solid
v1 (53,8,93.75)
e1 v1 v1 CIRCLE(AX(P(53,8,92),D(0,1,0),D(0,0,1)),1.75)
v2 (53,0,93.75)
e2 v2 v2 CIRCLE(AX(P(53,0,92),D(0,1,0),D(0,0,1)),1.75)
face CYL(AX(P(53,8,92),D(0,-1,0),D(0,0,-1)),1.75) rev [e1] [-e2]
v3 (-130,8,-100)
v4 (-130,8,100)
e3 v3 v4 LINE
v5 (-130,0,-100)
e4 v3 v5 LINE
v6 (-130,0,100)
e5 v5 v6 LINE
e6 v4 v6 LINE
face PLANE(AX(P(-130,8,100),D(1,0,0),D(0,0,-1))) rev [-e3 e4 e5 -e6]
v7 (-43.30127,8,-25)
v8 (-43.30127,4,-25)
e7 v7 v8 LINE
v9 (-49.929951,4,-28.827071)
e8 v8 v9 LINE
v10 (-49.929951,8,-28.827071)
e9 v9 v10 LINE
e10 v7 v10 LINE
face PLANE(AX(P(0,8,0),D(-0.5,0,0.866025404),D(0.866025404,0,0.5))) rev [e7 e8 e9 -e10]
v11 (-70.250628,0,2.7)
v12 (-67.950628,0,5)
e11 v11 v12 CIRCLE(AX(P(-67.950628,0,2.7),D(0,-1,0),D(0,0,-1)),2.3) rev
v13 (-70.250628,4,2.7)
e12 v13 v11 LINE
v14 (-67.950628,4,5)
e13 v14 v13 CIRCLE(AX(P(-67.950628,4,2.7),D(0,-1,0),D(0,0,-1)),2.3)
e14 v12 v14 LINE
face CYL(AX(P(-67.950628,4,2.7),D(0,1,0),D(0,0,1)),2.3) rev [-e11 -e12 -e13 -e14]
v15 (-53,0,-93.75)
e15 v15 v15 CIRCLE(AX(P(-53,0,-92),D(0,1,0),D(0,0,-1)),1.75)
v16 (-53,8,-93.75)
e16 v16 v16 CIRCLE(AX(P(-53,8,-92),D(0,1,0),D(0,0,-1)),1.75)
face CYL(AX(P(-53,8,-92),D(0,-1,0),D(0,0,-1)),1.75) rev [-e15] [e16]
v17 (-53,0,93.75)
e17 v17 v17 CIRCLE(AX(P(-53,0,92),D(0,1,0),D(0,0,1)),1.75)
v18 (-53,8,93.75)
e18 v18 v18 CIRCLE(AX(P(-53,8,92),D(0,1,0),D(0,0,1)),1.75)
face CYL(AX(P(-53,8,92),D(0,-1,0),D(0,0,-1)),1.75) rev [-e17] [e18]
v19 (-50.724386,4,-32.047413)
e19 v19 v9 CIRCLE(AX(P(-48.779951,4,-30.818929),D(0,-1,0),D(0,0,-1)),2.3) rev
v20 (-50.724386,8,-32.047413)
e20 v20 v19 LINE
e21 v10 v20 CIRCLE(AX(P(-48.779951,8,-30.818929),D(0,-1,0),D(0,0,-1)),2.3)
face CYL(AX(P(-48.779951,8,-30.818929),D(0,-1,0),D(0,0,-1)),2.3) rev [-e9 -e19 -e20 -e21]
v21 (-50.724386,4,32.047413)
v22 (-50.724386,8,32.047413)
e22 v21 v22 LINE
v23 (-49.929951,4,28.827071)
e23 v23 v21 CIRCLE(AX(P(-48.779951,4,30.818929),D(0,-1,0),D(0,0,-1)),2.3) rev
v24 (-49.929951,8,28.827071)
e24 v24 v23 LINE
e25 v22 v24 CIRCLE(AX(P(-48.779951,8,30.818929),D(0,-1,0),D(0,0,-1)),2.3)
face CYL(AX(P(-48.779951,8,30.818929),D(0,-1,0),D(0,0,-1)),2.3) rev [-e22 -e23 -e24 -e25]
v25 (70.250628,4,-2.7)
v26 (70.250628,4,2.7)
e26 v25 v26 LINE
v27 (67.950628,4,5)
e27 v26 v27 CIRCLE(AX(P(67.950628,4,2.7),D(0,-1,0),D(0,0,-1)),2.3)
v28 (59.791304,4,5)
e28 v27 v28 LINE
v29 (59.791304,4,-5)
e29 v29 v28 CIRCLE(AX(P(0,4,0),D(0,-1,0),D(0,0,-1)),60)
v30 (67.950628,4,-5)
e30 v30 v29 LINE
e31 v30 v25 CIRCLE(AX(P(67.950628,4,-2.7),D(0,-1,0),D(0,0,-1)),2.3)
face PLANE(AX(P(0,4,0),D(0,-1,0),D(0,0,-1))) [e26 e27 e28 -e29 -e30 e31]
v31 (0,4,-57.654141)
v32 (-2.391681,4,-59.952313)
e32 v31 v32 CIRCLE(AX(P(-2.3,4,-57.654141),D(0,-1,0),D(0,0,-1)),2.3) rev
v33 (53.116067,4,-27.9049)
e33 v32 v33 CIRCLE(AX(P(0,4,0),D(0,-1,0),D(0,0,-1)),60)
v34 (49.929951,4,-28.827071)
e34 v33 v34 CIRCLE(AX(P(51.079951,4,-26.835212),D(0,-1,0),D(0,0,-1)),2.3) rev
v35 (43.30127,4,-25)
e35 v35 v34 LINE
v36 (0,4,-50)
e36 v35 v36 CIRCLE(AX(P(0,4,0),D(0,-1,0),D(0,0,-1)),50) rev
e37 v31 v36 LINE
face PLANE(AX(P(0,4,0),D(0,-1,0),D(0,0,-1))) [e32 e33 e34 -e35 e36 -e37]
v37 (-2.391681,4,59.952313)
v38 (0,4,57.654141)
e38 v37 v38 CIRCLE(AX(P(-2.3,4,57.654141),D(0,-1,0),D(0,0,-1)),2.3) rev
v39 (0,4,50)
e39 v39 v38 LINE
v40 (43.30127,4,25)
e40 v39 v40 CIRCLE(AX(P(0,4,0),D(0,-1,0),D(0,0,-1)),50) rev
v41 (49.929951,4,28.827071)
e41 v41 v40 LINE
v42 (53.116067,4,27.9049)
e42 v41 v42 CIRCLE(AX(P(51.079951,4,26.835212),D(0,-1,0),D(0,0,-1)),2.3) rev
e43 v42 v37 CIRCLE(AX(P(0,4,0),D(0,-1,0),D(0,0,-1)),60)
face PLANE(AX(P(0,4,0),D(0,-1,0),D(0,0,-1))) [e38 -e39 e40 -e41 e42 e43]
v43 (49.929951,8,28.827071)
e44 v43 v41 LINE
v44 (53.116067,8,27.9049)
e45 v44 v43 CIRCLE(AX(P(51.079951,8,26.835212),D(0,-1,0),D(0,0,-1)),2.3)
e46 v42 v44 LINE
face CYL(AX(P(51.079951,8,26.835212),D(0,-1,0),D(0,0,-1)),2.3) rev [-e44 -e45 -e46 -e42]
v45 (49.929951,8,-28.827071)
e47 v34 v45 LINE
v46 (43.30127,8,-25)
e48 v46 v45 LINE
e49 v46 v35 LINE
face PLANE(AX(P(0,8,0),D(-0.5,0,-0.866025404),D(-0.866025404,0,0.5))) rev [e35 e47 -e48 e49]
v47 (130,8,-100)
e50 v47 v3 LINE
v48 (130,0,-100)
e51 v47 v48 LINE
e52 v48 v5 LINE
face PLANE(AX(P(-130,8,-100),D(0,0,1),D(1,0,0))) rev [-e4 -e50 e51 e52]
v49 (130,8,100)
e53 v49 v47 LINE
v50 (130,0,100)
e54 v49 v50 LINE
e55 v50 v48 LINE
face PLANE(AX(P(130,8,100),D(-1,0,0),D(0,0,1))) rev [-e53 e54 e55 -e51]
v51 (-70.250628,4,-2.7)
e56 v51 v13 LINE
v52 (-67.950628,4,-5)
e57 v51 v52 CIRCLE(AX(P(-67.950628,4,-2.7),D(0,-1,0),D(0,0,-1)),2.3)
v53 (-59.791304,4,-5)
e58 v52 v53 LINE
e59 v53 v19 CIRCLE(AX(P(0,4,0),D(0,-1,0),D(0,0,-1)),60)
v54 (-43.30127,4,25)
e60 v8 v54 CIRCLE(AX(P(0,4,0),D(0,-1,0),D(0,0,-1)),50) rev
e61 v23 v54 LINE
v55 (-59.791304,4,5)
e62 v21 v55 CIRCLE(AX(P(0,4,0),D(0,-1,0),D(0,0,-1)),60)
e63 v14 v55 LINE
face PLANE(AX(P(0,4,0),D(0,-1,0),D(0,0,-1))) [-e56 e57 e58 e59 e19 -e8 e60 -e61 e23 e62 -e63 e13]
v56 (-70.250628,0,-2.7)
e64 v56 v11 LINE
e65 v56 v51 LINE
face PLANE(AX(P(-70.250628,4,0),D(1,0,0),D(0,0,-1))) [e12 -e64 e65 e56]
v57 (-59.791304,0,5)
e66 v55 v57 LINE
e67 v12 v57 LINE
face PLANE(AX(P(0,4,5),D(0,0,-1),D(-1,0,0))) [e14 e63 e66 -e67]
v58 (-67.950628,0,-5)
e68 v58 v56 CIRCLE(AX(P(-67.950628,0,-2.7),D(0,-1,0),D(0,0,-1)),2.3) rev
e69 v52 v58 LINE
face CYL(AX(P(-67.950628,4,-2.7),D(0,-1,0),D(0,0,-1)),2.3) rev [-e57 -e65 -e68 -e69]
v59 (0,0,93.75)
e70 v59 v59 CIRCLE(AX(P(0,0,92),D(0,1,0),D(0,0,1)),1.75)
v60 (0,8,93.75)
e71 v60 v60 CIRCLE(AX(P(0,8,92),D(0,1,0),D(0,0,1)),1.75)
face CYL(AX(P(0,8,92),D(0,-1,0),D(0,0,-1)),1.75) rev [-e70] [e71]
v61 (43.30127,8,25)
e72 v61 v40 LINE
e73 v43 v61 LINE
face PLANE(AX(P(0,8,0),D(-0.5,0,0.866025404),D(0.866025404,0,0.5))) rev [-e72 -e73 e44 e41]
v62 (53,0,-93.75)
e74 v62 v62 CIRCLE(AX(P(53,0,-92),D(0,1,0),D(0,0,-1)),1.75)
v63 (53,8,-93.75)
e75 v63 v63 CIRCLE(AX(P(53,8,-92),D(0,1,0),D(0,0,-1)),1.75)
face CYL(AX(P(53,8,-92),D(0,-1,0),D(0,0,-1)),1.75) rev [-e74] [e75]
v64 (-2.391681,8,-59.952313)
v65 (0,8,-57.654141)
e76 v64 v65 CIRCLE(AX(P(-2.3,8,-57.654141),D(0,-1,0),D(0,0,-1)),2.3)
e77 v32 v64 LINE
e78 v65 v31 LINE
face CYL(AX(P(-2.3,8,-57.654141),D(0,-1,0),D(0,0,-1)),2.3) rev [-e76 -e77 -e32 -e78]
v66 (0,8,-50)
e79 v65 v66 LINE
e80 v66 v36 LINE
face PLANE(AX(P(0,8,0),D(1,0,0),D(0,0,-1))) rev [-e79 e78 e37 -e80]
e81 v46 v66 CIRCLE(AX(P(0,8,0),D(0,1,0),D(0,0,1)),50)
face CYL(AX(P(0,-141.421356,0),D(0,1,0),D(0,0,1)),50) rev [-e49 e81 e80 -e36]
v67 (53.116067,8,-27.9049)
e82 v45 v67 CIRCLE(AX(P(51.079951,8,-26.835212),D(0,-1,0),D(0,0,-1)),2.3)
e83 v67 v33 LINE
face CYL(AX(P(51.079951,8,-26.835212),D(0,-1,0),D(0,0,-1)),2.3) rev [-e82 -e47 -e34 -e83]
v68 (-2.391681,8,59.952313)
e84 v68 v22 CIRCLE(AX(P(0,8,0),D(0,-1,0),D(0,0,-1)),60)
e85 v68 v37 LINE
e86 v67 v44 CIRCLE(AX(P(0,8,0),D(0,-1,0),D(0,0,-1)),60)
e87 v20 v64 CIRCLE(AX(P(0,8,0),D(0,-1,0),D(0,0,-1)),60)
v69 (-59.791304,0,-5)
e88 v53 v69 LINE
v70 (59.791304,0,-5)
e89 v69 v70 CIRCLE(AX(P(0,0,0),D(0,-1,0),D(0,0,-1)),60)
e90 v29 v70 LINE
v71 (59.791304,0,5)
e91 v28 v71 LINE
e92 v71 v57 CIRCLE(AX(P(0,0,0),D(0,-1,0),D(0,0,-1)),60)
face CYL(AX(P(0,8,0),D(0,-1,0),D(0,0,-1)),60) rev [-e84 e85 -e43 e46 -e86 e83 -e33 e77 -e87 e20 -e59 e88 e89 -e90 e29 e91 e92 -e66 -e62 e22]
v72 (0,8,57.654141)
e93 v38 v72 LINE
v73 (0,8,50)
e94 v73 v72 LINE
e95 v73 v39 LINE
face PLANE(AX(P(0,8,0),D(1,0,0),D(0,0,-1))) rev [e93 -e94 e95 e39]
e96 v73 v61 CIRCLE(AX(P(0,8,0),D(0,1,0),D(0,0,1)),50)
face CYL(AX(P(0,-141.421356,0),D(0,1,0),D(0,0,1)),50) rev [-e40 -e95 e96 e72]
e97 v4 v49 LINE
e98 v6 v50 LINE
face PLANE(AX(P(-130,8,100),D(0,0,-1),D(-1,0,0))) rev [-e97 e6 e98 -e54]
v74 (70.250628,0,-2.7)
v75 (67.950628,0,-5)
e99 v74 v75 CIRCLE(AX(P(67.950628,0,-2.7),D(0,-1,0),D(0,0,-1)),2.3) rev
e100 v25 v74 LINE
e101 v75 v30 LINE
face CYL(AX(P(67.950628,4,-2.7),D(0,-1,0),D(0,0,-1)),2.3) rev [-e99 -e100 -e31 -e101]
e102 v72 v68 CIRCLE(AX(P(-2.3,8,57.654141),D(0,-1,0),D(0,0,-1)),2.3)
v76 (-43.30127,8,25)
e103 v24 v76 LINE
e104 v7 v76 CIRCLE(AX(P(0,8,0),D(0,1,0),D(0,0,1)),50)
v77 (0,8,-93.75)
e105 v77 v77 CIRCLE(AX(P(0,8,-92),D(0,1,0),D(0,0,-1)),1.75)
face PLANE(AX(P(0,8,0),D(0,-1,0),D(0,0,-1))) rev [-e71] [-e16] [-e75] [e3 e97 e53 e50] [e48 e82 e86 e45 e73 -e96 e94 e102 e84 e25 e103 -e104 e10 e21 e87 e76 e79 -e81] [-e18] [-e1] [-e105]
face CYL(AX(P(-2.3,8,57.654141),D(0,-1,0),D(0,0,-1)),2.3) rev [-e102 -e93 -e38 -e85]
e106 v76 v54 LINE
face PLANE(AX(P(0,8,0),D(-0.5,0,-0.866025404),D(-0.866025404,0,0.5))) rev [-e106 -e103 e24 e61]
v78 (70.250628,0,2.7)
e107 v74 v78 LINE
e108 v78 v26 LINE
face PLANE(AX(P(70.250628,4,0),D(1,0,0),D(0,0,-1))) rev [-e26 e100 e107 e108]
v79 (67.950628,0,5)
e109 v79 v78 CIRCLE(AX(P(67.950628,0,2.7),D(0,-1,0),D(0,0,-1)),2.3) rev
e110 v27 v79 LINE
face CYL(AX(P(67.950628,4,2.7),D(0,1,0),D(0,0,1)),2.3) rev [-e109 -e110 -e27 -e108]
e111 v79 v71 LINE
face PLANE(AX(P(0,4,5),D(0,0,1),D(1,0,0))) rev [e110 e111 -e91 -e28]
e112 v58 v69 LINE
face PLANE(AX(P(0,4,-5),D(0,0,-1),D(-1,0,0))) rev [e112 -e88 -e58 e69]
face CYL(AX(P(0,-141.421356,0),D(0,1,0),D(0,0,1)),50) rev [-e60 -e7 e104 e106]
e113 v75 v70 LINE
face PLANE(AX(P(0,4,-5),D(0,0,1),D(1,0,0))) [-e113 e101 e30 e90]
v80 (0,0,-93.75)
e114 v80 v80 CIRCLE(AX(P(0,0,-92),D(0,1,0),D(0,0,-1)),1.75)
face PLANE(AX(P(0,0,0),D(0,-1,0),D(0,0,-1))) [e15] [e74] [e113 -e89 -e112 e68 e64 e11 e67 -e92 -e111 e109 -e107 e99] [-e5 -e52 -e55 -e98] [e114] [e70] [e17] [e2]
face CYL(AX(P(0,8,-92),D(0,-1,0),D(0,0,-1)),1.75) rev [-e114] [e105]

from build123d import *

# Parameters (mm, degrees)
SKIZZE1_W                       = 260
SKIZZE1_H                       = 200
SKIZZE1_R                       = 1.749999999999997
SKIZZE1_R_2                     = 1.7500000000000038
SKIZZE1_R_3                     = 1.7500000000000042
AUFSATZ_LINEAR_AUSTRAGEN1_DEPTH = 8
SKIZZE2_R                       = 50
SCHNITT_LINEAR_AUSTRAGEN1_DEPTH = 8
SCHNITT_LINEAR_AUSTRAGEN4_DEPTH = 165.2071862008481
SCHNITT_LINEAR_AUSTRAGEN5_DEPTH = 4
VERRUNDUNG1_R                   = 2.3


with BuildPart() as part:
    # Skizze1 → Aufsatz-Linear austragen1 (new body)
    with BuildSketch(Plane(origin=(0, 0, 0), x_dir=(1, 0, 0), z_dir=(0, 1, 0))):
        Rectangle(SKIZZE1_W, SKIZZE1_H)
        with Locations(Location((-53, -92, 0), (0, 0, 270))):
            Circle(SKIZZE1_R, mode=Mode.SUBTRACT)
        with Locations(Location((53, -92, 0), (0, 0, 270))):
            Circle(SKIZZE1_R_2, mode=Mode.SUBTRACT)
        with Locations(Location((0, -92, 0), (0, 0, 270))):
            Circle(SKIZZE1_R_3, mode=Mode.SUBTRACT)
        with Locations(Location((-5.551e-14, 91.99999999999991, 0), (0, 0, 90))):
            Circle(SKIZZE1_R_3, mode=Mode.SUBTRACT)
        with Locations(Location((52.99999999999994, 91.99999999999991, 0), (0, 0, 90))):
            Circle(SKIZZE1_R_2, mode=Mode.SUBTRACT)
        with Locations(Location((-53.00000000000003, 91.99999999999989, 0), (0, 0, 90))):
            Circle(SKIZZE1_R, mode=Mode.SUBTRACT)
    extrude(amount=AUFSATZ_LINEAR_AUSTRAGEN1_DEPTH)

    # Skizze2 → Schnitt-Linear austragen1 (cut)
    with BuildSketch(Plane(origin=(0, 8, 0), x_dir=(1, 0, 0), z_dir=(0, 1, 0))):
        with Locations(Location((0, 0, 0), (0, 0, 270))):
            Circle(SKIZZE2_R)
    extrude(amount=-SCHNITT_LINEAR_AUSTRAGEN1_DEPTH, mode=Mode.SUBTRACT)

    # Skizze3 → Schnitt-Linear austragen4 (cut, through all)
    with BuildSketch(Plane.XZ):
        with BuildLine():
            ThreePointArc((60.00000000000001, 0), (59.947803224682126, 2.5021767593021864), (59.79130371550694, 5.000000000000675))
            Line((59.791303715506885, 5), (49.749371855331, 5))
            ThreePointArc((49.749371855331006, 5.000000000000001), (49.937303655516644, 2.503138752990944), (50.00000000000001, 0))
            ThreePointArc((50.00000000000001, -1.225e-14), (49.937303655516644, -2.503138752990955), (49.749371855331006, -5.00000000000001))
            Line((49.749371855331, -5), (59.791303715506885, -5))
            ThreePointArc((59.79130371550694, -5.0000000000006795), (59.947803224682126, -2.5021767593021957), (60.00000000000001, -1.47e-14))
        make_face()
        with BuildLine():
            ThreePointArc((59.79130371550694, 5.000000000000675), (57.257520364495285, 17.932550340356187), (51.961524227066455, 29.99999999999978))
            Line((51.961524227066455, 29.99999999999978), (43.30127018922205, 24.999999999999826))
            ThreePointArc((43.301270189222045, 24.999999999999822), (47.58787131429482, 15.342571615414302), (49.749371855331006, 5.000000000000001))
            Line((49.749371855331, 5), (59.791303715506885, 5))
        make_face()
        with BuildLine():
            Line((59.791303715506885, -5), (49.749371855331, -5))
            ThreePointArc((49.749371855331006, -5.00000000000001), (47.58787131429479, -15.342571615414398), (43.301270189221945, -24.999999999999986))
            Line((43.301270189221945, -24.999999999999993), (51.961524227066334, -29.999999999999993))
            ThreePointArc((51.961524227066334, -29.999999999999982), (57.25752036449525, -17.932550340356304), (59.79130371550694, -5.0000000000006795))
        make_face()
        with BuildLine():
            Line((-43.30127018922192, -25.00000000000002), (-51.961524227066306, -30.00000000000003))
            ThreePointArc((-51.96152422706632, -30.00000000000001), (-30.000000000000117, -51.961524227066256), (-2.7748e-13, -60.00000000000001))
            Line((-2.4633e-13, -60.00000000000001), (-1.9949e-13, -50.00000000000001))
            ThreePointArc((-1.8682e-13, -50.00000000000001), (-25.000000000000064, -43.3012701892219), (-43.30127018922194, -25.00000000000001))
        make_face()
        with BuildLine():
            ThreePointArc((3.67e-15, 60.00000000000001), (-29.999999999999876, 51.9615242270664), (-51.961524227066185, 30.000000000000256))
            Line((-51.961524227066185, 30.000000000000245), (-43.30127018922183, 25.0000000000002))
            ThreePointArc((-43.30127018922182, 25.000000000000213), (-24.999999999999897, 43.301270189221995), (3.06e-15, 50.00000000000001))
            Line((0, 50), (0, 60.00000000000001))
        make_face()
    extrude(amount=-SCHNITT_LINEAR_AUSTRAGEN4_DEPTH, mode=Mode.SUBTRACT)

    # Skizze3<5> → Schnitt-Linear austragen5 (cut)
    with BuildSketch(Plane.XZ):
        with BuildLine():
            Line((70.25062814466901, 5), (59.791303715506885, 5))
            ThreePointArc((59.79130371550694, 5.000000000000675), (59.947803224682126, 2.5021767593021864), (60.00000000000001, 0))
            ThreePointArc((60.00000000000001, -1.47e-14), (59.947803224682126, -2.5021767593021957), (59.79130371550694, -5.0000000000006795))
            Line((59.791303715506885, -5), (70.25062814466901, -5))
            Line((70.25062814466901, -5), (70.25062814466901, 5))
        make_face()
        with BuildLine():
            ThreePointArc((-59.79130371550711, -4.999999999998586), (-60.00000000000001, 7.35e-15), (-59.79130371550711, 4.999999999998601))
            Line((-59.791303715507226, 5), (-70.25062814466901, 5))
            Line((-70.25062814466901, 5), (-70.25062814466901, -5))
            Line((-70.25062814466901, -5), (-59.791303715507226, -5))
        make_face()
        with BuildLine():
            Line((-49.749371855331, -5), (-59.791303715507226, -5))
            ThreePointArc((-59.79130371550711, -4.999999999998586), (-57.257520364495555, -17.932550340355316), (-51.96152422706632, -30.00000000000001))
            Line((-51.961524227066306, -30.00000000000003), (-43.30127018922192, -25.00000000000002))
            ThreePointArc((-43.30127018922194, -25.00000000000001), (-47.58787131429479, -15.342571615414402), (-49.749371855331006, -4.999999999999992))
        make_face()
        with BuildLine():
            Line((-49.749371855331, 5), (-59.791303715507226, 5))
            ThreePointArc((-59.79130371550711, 4.999999999998601), (-60.00000000000001, 7.35e-15), (-59.79130371550711, -4.999999999998586))
            Line((-59.791303715507226, -5), (-49.749371855331, -5))
            ThreePointArc((-49.749371855331006, -4.999999999999992), (-50.00000000000001, 6.12e-15), (-49.749371855331006, 5.000000000000004))
        make_face()
        with BuildLine():
            Line((-43.30127018922183, 25.0000000000002), (-51.961524227066185, 30.000000000000245))
            ThreePointArc((-51.961524227066185, 30.000000000000256), (-57.25752036449551, 17.932550340355455), (-59.79130371550711, 4.999999999998601))
            Line((-59.791303715507226, 5), (-49.749371855331, 5))
            ThreePointArc((-49.749371855331006, 5.000000000000004), (-47.58787131429475, 15.342571615414519), (-43.30127018922182, 25.000000000000213))
        make_face()
        with BuildLine():
            ThreePointArc((51.961524227066455, 29.99999999999978), (30.00000000000011, 51.96152422706626), (3.67e-15, 60.00000000000001))
            Line((0, 60.00000000000001), (0, 50))
            ThreePointArc((3.06e-15, 50.00000000000001), (25.000000000000092, 43.30127018922189), (43.301270189222045, 24.99999999999982))
            Line((43.30127018922205, 24.999999999999826), (51.961524227066455, 29.99999999999978))
        make_face()
        with BuildLine():
            Line((-1.9949e-13, -50.00000000000001), (-2.4633e-13, -60.00000000000001))
            ThreePointArc((-2.7748e-13, -60.00000000000001), (29.99999999999987, -51.9615242270664), (51.961524227066334, -29.999999999999982))
            Line((51.961524227066334, -29.999999999999993), (43.301270189221945, -24.999999999999993))
            ThreePointArc((43.301270189221945, -24.999999999999986), (24.999999999999932, -43.30127018922198), (-1.8682e-13, -50.00000000000001))
        make_face()
    extrude(amount=-SCHNITT_LINEAR_AUSTRAGEN5_DEPTH, mode=Mode.SUBTRACT)

    # Verrundung1
    # the kernel refuses this fillet: 2.3 mm, written as the material it adds along each edge
    with BuildSketch(Plane(origin=(70.25062814466901, 0, 5), x_dir=(0, 0, -1), z_dir=(0, 1, 0))) as verrundung1_piece_1:
        with BuildLine():
            CenterArc((VERRUNDUNG1_R, VERRUNDUNG1_R), VERRUNDUNG1_R, 180, 90)
            Line((-8.9e-16, VERRUNDUNG1_R), (0, 0))
            Line((0, 0), (VERRUNDUNG1_R, 0))
        make_face()
    extrude(amount=4)
    with BuildSketch(Plane(origin=(70.25062814466901, 0, -5), x_dir=(-1, 0, 0), z_dir=(0, 1, 0))) as verrundung1_piece_2:
        with BuildLine():
            CenterArc((VERRUNDUNG1_R, VERRUNDUNG1_R), VERRUNDUNG1_R, 180, 90)
            Line((0, VERRUNDUNG1_R), (0, 0))
            Line((0, 0), (VERRUNDUNG1_R, 0))
        make_face()
    extrude(amount=4)
    with BuildSketch(Plane(origin=(-70.25062814466901, 0, -5), x_dir=(1, 0, 0), z_dir=(0, 1, 0))) as verrundung1_piece_3:
        with BuildLine():
            CenterArc((VERRUNDUNG1_R, -VERRUNDUNG1_R), VERRUNDUNG1_R, 90, 89.99999999999997)
            Line((0, -VERRUNDUNG1_R), (0, 0))
            Line((0, 0), (VERRUNDUNG1_R, 0))
        make_face()
    extrude(amount=4)
    with BuildSketch(Plane(origin=(-70.25062814466901, 0, 5), x_dir=(0, 0, -1), z_dir=(0, 1, 0))) as verrundung1_piece_4:
        with BuildLine():
            CenterArc((VERRUNDUNG1_R, -VERRUNDUNG1_R), VERRUNDUNG1_R, 90, 90)
            Line((0, -VERRUNDUNG1_R), (0, 0))
            Line((0, 0), (VERRUNDUNG1_R, 0))
        make_face()
    extrude(amount=4)
    with BuildSketch(Plane(origin=(51.96152422706646, 4, 29.99999999999978), x_dir=(0.48263674044551186, 0, -0.8758206304787137), z_dir=(0, 1, 0))) as verrundung1_piece_5:
        with BuildLine():
            CenterArc((2.346306800066914, 2.2995429563643968), VERRUNDUNG1_R, 178.8577537601654, 92.2844924796575)
            Line((0.04676384370252609, 2.345392621956658), (0, 0))
            ThreePointArc((0, 0), (1.1960782328293844, -0.01192287745045764), (2.392156465658705, -7e-17))
        make_face()
    extrude(amount=4)
    with BuildSketch(Plane(origin=(51.961524227066334, 4, -29.99999999999999), x_dir=(-0.8660254037844398, 0, 0.499999999999998), z_dir=(0, 1, 0))) as verrundung1_piece_6:
        with BuildLine():
            CenterArc((2.345858778401576, 2.2999999999999994), VERRUNDUNG1_R, 177.71550752035841, 92.2844924796417)
            ThreePointArc((0.04768677130146285, 2.3916811091852797), (0.011922877450426, 1.1960782328291542), (0, 0))
            Line((0, 0), (2.34585877840158, -4e-17))
        make_face()
    extrude(amount=4)
    with BuildSketch(Plane(origin=(-51.96152422706631, 4, -30.00000000000002), x_dir=(0.8660254037844404, 0, 0.49999999999999717), z_dir=(0, 1, 0))) as verrundung1_piece_7:
        with BuildLine():
            CenterArc((2.3458587784015195, 2.2999999999999994), VERRUNDUNG1_R, 177.71550752035327, 92.28449247964659)
            ThreePointArc((0.04768677130141288, 2.3916811091854857), (0.01192287745041601, 1.196078232829249), (0, 0))
            Line((0, 0), (2.3458587784015132, -4e-17))
        make_face()
    extrude(amount=4)
    with BuildSketch(Plane(origin=(-2.6083e-13, 4, -60), x_dir=(1.086e-14, 0, 1), z_dir=(0, 1, 0))) as verrundung1_piece_8:
        with BuildLine():
            CenterArc((2.3458587784010057, -2.3), VERRUNDUNG1_R, 89.99999999999973, 92.28449247964573)
            ThreePointArc((0.04768677130089817, -2.3916811091854364), (0.01192287745039645, -1.1960782328292843), (0, 0))
            Line((0, 0), (2.3458587784010163, 0))
        make_face()
    extrude(amount=4)
    with BuildSketch(Plane(origin=(1.84e-15, 4, 60.00000000000001), x_dir=(-7.8e-16, 0, -1), z_dir=(0, 1, 0))) as verrundung1_piece_9:
        with BuildLine():
            CenterArc((2.3458587784015865, 2.3), VERRUNDUNG1_R, 177.71550752035446, 92.28449247964545)
            ThreePointArc((0.04768677130148023, 2.3916811091854395), (0.011922877450453, 1.1960782328292412), (0, 0))
            Line((0, 0), (2.3458587784015847, 0))
        make_face()
    extrude(amount=4)
    with BuildSketch(Plane(origin=(-51.961524227066185, 4, 30.00000000000025), x_dir=(0.8660254037844354, 0, -0.5000000000000054), z_dir=(0, 1, 0))) as verrundung1_piece_10:
        with BuildLine():
            CenterArc((2.3458587784015092, -2.3), VERRUNDUNG1_R, 90, 92.28449247965011)
            ThreePointArc((0.04768677130141038, -2.3916811091856207), (0.0119228774504358, -1.1960782328293367), (0, 0))
            Line((0, 0), (2.3458587784015092, -2e-16))
        make_face()
    extrude(amount=4)


solid = part.part
